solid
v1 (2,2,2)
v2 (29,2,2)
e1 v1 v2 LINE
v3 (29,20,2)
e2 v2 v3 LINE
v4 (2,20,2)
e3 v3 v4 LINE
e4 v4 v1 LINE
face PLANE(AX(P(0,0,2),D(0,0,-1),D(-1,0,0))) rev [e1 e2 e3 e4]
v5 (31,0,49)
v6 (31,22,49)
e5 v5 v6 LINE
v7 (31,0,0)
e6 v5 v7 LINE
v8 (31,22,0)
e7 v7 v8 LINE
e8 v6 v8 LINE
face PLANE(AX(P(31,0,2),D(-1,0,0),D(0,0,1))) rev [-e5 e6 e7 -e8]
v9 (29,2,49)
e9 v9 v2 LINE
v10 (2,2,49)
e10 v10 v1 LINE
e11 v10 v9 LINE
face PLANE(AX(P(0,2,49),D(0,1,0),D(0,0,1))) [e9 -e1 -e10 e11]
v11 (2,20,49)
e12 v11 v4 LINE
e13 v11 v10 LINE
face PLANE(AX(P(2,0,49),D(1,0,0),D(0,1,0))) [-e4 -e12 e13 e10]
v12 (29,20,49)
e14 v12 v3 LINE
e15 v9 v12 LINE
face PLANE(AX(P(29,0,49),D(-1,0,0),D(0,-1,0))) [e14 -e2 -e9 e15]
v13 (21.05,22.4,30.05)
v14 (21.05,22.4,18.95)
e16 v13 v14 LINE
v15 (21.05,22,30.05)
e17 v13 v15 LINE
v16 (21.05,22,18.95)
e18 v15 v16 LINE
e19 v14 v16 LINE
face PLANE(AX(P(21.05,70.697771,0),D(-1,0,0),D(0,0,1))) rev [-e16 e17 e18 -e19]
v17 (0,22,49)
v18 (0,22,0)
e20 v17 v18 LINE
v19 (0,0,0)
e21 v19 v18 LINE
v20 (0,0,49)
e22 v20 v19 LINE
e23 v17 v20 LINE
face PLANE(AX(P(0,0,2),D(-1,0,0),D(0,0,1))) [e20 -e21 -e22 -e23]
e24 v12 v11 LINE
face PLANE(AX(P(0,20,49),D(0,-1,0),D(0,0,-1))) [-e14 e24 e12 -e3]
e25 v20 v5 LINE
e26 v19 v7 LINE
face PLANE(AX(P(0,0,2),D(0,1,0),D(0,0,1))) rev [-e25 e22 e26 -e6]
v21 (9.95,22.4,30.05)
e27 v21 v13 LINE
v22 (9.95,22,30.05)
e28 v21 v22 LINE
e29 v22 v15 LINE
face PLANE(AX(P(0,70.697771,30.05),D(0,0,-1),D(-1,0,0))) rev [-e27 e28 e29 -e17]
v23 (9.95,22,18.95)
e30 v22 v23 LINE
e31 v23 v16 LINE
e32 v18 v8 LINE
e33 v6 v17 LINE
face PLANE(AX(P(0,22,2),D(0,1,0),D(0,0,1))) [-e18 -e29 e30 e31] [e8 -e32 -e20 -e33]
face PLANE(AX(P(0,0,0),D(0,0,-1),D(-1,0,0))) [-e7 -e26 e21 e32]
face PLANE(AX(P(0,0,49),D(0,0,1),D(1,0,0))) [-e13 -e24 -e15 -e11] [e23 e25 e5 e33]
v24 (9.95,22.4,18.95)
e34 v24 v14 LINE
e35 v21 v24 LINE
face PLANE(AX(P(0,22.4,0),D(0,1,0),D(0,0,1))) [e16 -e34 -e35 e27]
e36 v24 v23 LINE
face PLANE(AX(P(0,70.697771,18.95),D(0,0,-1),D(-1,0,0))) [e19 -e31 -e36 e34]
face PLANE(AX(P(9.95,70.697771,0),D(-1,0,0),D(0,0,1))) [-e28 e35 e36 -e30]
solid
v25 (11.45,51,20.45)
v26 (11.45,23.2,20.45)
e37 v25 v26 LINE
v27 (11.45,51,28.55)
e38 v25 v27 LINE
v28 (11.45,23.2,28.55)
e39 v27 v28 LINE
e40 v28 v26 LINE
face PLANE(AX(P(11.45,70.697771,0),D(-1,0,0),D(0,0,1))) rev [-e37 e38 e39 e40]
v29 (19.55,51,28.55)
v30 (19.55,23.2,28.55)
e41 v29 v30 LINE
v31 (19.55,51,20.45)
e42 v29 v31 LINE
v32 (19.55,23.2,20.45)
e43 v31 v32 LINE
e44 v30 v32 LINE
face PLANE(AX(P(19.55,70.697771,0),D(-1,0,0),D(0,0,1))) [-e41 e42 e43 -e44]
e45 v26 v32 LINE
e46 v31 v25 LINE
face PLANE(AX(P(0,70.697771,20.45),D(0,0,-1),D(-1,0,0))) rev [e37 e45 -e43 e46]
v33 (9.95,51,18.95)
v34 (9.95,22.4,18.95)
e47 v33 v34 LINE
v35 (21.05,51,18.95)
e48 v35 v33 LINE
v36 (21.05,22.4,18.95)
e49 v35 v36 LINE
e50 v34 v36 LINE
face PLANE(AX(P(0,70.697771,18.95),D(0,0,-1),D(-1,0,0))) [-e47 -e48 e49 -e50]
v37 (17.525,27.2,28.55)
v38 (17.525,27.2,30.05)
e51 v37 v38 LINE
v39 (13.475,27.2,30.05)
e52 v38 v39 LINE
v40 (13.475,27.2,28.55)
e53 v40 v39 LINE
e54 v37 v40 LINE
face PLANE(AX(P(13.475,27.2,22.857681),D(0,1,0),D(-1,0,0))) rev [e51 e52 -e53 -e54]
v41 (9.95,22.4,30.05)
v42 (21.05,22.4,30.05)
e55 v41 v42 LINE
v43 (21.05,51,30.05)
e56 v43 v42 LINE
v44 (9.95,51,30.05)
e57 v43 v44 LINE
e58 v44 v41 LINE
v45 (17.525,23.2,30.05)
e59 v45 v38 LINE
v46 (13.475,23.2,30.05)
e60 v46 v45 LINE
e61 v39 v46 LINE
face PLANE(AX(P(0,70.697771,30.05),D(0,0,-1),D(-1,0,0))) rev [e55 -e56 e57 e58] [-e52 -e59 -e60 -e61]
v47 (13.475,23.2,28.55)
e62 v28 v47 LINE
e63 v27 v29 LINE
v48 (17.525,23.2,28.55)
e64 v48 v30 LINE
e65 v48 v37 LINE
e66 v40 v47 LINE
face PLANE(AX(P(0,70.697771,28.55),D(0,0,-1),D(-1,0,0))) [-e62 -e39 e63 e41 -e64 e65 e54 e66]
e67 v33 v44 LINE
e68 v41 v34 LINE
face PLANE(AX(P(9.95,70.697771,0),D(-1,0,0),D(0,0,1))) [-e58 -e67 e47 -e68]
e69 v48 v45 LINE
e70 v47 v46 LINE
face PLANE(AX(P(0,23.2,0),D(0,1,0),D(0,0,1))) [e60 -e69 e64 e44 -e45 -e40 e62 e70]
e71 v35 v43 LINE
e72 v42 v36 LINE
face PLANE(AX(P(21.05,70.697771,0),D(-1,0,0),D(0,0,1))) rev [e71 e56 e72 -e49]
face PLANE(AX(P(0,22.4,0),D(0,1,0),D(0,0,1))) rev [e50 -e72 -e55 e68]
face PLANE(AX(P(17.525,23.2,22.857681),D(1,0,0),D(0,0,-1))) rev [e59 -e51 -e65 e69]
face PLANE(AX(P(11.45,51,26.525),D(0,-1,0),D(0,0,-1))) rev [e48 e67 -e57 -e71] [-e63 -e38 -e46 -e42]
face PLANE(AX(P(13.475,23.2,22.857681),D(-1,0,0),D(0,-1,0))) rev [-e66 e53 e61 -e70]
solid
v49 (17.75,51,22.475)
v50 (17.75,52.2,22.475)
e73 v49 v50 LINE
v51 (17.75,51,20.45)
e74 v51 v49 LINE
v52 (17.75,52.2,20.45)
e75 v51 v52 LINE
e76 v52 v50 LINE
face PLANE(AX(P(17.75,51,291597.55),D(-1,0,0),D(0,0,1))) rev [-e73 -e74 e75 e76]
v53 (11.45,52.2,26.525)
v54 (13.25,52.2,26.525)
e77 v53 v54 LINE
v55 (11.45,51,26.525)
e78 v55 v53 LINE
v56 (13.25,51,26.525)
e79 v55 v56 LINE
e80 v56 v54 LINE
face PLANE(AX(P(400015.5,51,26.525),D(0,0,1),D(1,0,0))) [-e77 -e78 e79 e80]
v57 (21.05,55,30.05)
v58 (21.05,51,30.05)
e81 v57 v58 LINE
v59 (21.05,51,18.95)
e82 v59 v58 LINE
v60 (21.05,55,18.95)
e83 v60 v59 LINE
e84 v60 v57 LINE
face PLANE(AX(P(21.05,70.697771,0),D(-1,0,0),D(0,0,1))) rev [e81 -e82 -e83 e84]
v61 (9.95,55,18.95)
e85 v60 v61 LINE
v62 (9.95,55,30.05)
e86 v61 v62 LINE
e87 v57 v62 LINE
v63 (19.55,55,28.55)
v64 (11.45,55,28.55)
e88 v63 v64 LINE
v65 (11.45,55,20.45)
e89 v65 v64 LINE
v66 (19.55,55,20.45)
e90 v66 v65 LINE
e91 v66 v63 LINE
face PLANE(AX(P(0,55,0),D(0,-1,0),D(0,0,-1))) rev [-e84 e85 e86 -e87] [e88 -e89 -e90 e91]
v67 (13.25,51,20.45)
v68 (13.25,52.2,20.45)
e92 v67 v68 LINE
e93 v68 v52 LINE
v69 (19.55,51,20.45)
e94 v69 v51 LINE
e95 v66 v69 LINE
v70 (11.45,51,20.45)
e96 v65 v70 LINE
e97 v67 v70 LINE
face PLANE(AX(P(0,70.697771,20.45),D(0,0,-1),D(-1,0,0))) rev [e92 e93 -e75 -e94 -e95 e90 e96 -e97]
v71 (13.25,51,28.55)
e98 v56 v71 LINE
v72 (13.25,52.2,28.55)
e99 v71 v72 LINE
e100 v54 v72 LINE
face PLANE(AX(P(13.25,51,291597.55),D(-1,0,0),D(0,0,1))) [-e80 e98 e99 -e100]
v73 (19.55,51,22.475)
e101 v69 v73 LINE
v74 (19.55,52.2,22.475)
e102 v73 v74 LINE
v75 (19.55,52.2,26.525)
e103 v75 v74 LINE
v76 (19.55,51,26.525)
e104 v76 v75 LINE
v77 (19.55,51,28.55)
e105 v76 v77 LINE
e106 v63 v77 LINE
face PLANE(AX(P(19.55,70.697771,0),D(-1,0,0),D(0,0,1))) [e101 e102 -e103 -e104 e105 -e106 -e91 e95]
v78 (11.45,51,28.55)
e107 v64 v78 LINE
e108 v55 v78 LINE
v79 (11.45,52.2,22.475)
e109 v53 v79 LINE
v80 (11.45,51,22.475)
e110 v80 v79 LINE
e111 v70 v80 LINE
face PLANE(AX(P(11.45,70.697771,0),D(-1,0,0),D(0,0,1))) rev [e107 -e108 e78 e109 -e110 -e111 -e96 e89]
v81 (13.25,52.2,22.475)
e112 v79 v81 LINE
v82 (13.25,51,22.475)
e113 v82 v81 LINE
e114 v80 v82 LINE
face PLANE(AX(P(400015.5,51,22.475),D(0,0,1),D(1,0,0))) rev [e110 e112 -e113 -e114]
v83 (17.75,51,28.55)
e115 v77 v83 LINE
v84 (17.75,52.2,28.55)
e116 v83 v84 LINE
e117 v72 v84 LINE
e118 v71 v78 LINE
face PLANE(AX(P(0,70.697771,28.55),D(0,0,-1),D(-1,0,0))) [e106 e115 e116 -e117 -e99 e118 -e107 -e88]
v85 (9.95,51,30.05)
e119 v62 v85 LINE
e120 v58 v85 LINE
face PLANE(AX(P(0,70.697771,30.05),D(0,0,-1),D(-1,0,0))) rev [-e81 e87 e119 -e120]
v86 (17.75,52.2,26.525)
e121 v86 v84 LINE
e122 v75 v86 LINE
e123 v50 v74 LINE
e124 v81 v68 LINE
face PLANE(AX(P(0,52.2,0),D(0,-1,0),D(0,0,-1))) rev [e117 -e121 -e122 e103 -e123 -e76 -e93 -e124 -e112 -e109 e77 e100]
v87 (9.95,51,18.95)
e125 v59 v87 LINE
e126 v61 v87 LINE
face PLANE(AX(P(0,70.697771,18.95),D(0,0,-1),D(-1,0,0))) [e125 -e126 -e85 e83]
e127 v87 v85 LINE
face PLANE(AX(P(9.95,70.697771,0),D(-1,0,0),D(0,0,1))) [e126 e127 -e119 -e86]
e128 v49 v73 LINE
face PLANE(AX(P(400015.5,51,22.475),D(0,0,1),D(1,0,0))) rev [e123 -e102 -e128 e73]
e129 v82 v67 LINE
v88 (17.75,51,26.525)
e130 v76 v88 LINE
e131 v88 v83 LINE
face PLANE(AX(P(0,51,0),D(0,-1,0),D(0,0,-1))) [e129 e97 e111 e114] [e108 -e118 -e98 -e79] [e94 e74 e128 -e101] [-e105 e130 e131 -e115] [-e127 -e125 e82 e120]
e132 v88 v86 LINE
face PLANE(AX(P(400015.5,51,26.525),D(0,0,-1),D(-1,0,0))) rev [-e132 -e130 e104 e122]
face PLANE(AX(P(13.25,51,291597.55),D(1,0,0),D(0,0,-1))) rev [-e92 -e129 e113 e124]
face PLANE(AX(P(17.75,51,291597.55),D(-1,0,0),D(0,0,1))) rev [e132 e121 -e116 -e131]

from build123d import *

# Parameters (mm, degrees)
SKETCH1_W            = 31
SKETCH1_H            = 22
BOSS_EXTRUDE1_DEPTH  = 2
BOSS_EXTRUDE2_START  = 2
SKETCH1_3_W          = 31
SKETCH1_3_H          = 22
SKETCH1_3_W_2        = 27
SKETCH1_3_H_2        = 18
BOSS_EXTRUDE2_DEPTH  = 47
SKETCH2_W            = 11.1
SKETCH2_H            = 11.1
SKETCH2_W_2          = 8.1
SKETCH2_H_2          = 8.1
BOSS_EXTRUDE3_DEPTH  = 33
SKETCH2_7_W          = 11.1
SKETCH2_7_H          = 11.1
BOSS_EXTRUDE6_DEPTH  = 1.2
SKETCH3_W            = 4.05
SKETCH3_H            = 4
CUT_EXTRUDE1_DEPTH   = 1.5
BOSS_EXTRUDE4_START  = 30.2
BOSS_EXTRUDE4_DEPTH  = 1.2
SPLIT2_START         = 22.4
SPLIT2_OUTLINE_W     = 11.1
SPLIT2_OUTLINE_H     = 11.1
SPLIT2_DEPTH         = 32.6
SPLIT2_2_DEPTH       = 28.6
SPLIT2_START_2       = 27.2
SPLIT2_3_OUTLINE_W   = 4.05
SPLIT2_3_OUTLINE_H   = 1.5
SPLIT2_3_DEPTH       = 23.8
SPLIT2_4_DEPTH       = 0.8
SPLIT2_START_3       = 51
SPLIT2_5_OUTLINE_W   = 11.1
SPLIT2_5_OUTLINE_H   = 11.1
SPLIT2_5_OUTLINE_W_2 = 8.1
SPLIT2_5_OUTLINE_H_2 = 8.1
SPLIT2_5_DEPTH       = 4
SPLIT2_6_DEPTH       = 1.2


# Read off the part's stored shape, not the designer's step: Split2
with BuildPart() as part:
    # Sketch1 → Boss-Extrude1 (new body)
    with BuildSketch(Plane.XY):
        with Locations((15.5, 11)):
            Rectangle(SKETCH1_W, SKETCH1_H)
    extrude(amount=BOSS_EXTRUDE1_DEPTH)

    # Sketch1<3> → Boss-Extrude2 (add)
    with BuildSketch(Plane.XY.offset(BOSS_EXTRUDE2_START)):
        with Locations((15.5, 11)):
            Rectangle(SKETCH1_3_W, SKETCH1_3_H)
        with Locations((15.5, 11)):
            Rectangle(SKETCH1_3_W_2, SKETCH1_3_H_2, mode=Mode.SUBTRACT)
    extrude(amount=BOSS_EXTRUDE2_DEPTH)

    # Sketch2 → Boss-Extrude3 (add)
    with BuildSketch(Plane(origin=(0, 22, 0), x_dir=(1, 0, 0), z_dir=(0, 1, 0))):
        with Locations((15.5, -24.5)):
            Rectangle(SKETCH2_W, SKETCH2_H)
        with Locations((15.5, -24.5)):
            Rectangle(SKETCH2_W_2, SKETCH2_H_2, mode=Mode.SUBTRACT)
    extrude(amount=BOSS_EXTRUDE3_DEPTH)

    # Sketch2<7> → Boss-Extrude6 (add)
    with BuildSketch(Plane(origin=(0, 22, 0), x_dir=(1, 0, 0), z_dir=(0, 1, 0))):
        with Locations((15.5, -24.5)):
            Rectangle(SKETCH2_7_W, SKETCH2_7_H)
    extrude(amount=BOSS_EXTRUDE6_DEPTH)

    # Sketch3 → Cut-Extrude1 (cut)
    with BuildSketch(Plane.XY.offset(30.05)):
        with Locations((15.5, 25.2)):
            Rectangle(SKETCH3_W, SKETCH3_H)
    extrude(amount=-CUT_EXTRUDE1_DEPTH, mode=Mode.SUBTRACT)

    # Sketch2<5> → Boss-Extrude4 (add)
    with BuildSketch(Plane(origin=(0, 22, 0), x_dir=(1, 0, 0), z_dir=(0, 1, 0)).offset(BOSS_EXTRUDE4_START)):
        Polygon((13.25, -26.525), (13.25, -28.55), (17.75, -28.55), (17.75, -26.525), (19.55, -26.525), (19.55, -22.475), (17.75, -22.475), (17.75, -20.45), (13.25, -20.45), (13.25, -22.475), (11.45, -22.475), (11.45, -26.525), align=None)
    extrude(amount=-BOSS_EXTRUDE4_DEPTH)

    # Split2 outline → Split2 (cut)
    with BuildSketch(Plane(origin=(0, 0, 0), x_dir=(1, 0, 0), z_dir=(0, 1, 0)).offset(SPLIT2_START)):
        with Locations((15.5, -24.5)):
            Rectangle(SPLIT2_OUTLINE_W, SPLIT2_OUTLINE_H)
    extrude(amount=SPLIT2_DEPTH, mode=Mode.SUBTRACT)


with BuildPart() as body_2:
    # Split2 2 outline → Split2 2 (new body)
    with BuildSketch(Plane(origin=(0, 0, 0), x_dir=(1, 0, 0), z_dir=(0, 1, 0)).offset(SPLIT2_START)):
        Polygon((11.45, -20.45), (19.55, -20.45), (19.55, -28.55), (17.525, -28.55), (17.525, -30.05), (21.05, -30.05), (21.05, -18.95), (9.95, -18.95), (9.95, -30.05), (13.475, -30.05), (13.475, -28.55), (11.45, -28.55), align=None)
    extrude(amount=SPLIT2_2_DEPTH)

    # Split2 3 outline → Split2 3 (add)
    with BuildSketch(Plane(origin=(0, 0, 0), x_dir=(1, 0, 0), z_dir=(0, 1, 0)).offset(SPLIT2_START_2)):
        with Locations((15.5, -29.3)):
            Rectangle(SPLIT2_3_OUTLINE_W, SPLIT2_3_OUTLINE_H)
    extrude(amount=SPLIT2_3_DEPTH)

    # Split2 4 outline → Split2 4 (add)
    with BuildSketch(Plane(origin=(0, 0, 0), x_dir=(1, 0, 0), z_dir=(0, 1, 0)).offset(SPLIT2_START)):
        Polygon((19.55, -28.55), (19.55, -20.45), (11.45, -20.45), (11.45, -28.55), (13.475, -28.55), (13.475, -30.05), (17.525, -30.05), (17.525, -28.55), align=None)
    extrude(amount=SPLIT2_4_DEPTH)


with BuildPart() as body_3:
    # Split2 5 outline → Split2 5 (new body)
    with BuildSketch(Plane(origin=(0, 0, 0), x_dir=(1, 0, 0), z_dir=(0, 1, 0)).offset(SPLIT2_START_3)):
        with Locations((15.5, -24.5)):
            Rectangle(SPLIT2_5_OUTLINE_W, SPLIT2_5_OUTLINE_H)
        with Locations((15.5, -24.5)):
            Rectangle(SPLIT2_5_OUTLINE_W_2, SPLIT2_5_OUTLINE_H_2, mode=Mode.SUBTRACT)
    extrude(amount=SPLIT2_5_DEPTH)

    # Split2 6 outline → Split2 6 (add)
    with BuildSketch(Plane(origin=(0, 0, 0), x_dir=(1, 0, 0), z_dir=(0, 1, 0)).offset(SPLIT2_START_3)):
        Polygon((13.25, -22.475), (11.45, -22.475), (11.45, -26.525), (13.25, -26.525), (13.25, -28.55), (17.75, -28.55), (17.75, -26.525), (19.55, -26.525), (19.55, -22.475), (17.75, -22.475), (17.75, -20.45), (13.25, -20.45), align=None)
    extrude(amount=SPLIT2_6_DEPTH)


solid = Compound([part.part, body_2.part, body_3.part])
